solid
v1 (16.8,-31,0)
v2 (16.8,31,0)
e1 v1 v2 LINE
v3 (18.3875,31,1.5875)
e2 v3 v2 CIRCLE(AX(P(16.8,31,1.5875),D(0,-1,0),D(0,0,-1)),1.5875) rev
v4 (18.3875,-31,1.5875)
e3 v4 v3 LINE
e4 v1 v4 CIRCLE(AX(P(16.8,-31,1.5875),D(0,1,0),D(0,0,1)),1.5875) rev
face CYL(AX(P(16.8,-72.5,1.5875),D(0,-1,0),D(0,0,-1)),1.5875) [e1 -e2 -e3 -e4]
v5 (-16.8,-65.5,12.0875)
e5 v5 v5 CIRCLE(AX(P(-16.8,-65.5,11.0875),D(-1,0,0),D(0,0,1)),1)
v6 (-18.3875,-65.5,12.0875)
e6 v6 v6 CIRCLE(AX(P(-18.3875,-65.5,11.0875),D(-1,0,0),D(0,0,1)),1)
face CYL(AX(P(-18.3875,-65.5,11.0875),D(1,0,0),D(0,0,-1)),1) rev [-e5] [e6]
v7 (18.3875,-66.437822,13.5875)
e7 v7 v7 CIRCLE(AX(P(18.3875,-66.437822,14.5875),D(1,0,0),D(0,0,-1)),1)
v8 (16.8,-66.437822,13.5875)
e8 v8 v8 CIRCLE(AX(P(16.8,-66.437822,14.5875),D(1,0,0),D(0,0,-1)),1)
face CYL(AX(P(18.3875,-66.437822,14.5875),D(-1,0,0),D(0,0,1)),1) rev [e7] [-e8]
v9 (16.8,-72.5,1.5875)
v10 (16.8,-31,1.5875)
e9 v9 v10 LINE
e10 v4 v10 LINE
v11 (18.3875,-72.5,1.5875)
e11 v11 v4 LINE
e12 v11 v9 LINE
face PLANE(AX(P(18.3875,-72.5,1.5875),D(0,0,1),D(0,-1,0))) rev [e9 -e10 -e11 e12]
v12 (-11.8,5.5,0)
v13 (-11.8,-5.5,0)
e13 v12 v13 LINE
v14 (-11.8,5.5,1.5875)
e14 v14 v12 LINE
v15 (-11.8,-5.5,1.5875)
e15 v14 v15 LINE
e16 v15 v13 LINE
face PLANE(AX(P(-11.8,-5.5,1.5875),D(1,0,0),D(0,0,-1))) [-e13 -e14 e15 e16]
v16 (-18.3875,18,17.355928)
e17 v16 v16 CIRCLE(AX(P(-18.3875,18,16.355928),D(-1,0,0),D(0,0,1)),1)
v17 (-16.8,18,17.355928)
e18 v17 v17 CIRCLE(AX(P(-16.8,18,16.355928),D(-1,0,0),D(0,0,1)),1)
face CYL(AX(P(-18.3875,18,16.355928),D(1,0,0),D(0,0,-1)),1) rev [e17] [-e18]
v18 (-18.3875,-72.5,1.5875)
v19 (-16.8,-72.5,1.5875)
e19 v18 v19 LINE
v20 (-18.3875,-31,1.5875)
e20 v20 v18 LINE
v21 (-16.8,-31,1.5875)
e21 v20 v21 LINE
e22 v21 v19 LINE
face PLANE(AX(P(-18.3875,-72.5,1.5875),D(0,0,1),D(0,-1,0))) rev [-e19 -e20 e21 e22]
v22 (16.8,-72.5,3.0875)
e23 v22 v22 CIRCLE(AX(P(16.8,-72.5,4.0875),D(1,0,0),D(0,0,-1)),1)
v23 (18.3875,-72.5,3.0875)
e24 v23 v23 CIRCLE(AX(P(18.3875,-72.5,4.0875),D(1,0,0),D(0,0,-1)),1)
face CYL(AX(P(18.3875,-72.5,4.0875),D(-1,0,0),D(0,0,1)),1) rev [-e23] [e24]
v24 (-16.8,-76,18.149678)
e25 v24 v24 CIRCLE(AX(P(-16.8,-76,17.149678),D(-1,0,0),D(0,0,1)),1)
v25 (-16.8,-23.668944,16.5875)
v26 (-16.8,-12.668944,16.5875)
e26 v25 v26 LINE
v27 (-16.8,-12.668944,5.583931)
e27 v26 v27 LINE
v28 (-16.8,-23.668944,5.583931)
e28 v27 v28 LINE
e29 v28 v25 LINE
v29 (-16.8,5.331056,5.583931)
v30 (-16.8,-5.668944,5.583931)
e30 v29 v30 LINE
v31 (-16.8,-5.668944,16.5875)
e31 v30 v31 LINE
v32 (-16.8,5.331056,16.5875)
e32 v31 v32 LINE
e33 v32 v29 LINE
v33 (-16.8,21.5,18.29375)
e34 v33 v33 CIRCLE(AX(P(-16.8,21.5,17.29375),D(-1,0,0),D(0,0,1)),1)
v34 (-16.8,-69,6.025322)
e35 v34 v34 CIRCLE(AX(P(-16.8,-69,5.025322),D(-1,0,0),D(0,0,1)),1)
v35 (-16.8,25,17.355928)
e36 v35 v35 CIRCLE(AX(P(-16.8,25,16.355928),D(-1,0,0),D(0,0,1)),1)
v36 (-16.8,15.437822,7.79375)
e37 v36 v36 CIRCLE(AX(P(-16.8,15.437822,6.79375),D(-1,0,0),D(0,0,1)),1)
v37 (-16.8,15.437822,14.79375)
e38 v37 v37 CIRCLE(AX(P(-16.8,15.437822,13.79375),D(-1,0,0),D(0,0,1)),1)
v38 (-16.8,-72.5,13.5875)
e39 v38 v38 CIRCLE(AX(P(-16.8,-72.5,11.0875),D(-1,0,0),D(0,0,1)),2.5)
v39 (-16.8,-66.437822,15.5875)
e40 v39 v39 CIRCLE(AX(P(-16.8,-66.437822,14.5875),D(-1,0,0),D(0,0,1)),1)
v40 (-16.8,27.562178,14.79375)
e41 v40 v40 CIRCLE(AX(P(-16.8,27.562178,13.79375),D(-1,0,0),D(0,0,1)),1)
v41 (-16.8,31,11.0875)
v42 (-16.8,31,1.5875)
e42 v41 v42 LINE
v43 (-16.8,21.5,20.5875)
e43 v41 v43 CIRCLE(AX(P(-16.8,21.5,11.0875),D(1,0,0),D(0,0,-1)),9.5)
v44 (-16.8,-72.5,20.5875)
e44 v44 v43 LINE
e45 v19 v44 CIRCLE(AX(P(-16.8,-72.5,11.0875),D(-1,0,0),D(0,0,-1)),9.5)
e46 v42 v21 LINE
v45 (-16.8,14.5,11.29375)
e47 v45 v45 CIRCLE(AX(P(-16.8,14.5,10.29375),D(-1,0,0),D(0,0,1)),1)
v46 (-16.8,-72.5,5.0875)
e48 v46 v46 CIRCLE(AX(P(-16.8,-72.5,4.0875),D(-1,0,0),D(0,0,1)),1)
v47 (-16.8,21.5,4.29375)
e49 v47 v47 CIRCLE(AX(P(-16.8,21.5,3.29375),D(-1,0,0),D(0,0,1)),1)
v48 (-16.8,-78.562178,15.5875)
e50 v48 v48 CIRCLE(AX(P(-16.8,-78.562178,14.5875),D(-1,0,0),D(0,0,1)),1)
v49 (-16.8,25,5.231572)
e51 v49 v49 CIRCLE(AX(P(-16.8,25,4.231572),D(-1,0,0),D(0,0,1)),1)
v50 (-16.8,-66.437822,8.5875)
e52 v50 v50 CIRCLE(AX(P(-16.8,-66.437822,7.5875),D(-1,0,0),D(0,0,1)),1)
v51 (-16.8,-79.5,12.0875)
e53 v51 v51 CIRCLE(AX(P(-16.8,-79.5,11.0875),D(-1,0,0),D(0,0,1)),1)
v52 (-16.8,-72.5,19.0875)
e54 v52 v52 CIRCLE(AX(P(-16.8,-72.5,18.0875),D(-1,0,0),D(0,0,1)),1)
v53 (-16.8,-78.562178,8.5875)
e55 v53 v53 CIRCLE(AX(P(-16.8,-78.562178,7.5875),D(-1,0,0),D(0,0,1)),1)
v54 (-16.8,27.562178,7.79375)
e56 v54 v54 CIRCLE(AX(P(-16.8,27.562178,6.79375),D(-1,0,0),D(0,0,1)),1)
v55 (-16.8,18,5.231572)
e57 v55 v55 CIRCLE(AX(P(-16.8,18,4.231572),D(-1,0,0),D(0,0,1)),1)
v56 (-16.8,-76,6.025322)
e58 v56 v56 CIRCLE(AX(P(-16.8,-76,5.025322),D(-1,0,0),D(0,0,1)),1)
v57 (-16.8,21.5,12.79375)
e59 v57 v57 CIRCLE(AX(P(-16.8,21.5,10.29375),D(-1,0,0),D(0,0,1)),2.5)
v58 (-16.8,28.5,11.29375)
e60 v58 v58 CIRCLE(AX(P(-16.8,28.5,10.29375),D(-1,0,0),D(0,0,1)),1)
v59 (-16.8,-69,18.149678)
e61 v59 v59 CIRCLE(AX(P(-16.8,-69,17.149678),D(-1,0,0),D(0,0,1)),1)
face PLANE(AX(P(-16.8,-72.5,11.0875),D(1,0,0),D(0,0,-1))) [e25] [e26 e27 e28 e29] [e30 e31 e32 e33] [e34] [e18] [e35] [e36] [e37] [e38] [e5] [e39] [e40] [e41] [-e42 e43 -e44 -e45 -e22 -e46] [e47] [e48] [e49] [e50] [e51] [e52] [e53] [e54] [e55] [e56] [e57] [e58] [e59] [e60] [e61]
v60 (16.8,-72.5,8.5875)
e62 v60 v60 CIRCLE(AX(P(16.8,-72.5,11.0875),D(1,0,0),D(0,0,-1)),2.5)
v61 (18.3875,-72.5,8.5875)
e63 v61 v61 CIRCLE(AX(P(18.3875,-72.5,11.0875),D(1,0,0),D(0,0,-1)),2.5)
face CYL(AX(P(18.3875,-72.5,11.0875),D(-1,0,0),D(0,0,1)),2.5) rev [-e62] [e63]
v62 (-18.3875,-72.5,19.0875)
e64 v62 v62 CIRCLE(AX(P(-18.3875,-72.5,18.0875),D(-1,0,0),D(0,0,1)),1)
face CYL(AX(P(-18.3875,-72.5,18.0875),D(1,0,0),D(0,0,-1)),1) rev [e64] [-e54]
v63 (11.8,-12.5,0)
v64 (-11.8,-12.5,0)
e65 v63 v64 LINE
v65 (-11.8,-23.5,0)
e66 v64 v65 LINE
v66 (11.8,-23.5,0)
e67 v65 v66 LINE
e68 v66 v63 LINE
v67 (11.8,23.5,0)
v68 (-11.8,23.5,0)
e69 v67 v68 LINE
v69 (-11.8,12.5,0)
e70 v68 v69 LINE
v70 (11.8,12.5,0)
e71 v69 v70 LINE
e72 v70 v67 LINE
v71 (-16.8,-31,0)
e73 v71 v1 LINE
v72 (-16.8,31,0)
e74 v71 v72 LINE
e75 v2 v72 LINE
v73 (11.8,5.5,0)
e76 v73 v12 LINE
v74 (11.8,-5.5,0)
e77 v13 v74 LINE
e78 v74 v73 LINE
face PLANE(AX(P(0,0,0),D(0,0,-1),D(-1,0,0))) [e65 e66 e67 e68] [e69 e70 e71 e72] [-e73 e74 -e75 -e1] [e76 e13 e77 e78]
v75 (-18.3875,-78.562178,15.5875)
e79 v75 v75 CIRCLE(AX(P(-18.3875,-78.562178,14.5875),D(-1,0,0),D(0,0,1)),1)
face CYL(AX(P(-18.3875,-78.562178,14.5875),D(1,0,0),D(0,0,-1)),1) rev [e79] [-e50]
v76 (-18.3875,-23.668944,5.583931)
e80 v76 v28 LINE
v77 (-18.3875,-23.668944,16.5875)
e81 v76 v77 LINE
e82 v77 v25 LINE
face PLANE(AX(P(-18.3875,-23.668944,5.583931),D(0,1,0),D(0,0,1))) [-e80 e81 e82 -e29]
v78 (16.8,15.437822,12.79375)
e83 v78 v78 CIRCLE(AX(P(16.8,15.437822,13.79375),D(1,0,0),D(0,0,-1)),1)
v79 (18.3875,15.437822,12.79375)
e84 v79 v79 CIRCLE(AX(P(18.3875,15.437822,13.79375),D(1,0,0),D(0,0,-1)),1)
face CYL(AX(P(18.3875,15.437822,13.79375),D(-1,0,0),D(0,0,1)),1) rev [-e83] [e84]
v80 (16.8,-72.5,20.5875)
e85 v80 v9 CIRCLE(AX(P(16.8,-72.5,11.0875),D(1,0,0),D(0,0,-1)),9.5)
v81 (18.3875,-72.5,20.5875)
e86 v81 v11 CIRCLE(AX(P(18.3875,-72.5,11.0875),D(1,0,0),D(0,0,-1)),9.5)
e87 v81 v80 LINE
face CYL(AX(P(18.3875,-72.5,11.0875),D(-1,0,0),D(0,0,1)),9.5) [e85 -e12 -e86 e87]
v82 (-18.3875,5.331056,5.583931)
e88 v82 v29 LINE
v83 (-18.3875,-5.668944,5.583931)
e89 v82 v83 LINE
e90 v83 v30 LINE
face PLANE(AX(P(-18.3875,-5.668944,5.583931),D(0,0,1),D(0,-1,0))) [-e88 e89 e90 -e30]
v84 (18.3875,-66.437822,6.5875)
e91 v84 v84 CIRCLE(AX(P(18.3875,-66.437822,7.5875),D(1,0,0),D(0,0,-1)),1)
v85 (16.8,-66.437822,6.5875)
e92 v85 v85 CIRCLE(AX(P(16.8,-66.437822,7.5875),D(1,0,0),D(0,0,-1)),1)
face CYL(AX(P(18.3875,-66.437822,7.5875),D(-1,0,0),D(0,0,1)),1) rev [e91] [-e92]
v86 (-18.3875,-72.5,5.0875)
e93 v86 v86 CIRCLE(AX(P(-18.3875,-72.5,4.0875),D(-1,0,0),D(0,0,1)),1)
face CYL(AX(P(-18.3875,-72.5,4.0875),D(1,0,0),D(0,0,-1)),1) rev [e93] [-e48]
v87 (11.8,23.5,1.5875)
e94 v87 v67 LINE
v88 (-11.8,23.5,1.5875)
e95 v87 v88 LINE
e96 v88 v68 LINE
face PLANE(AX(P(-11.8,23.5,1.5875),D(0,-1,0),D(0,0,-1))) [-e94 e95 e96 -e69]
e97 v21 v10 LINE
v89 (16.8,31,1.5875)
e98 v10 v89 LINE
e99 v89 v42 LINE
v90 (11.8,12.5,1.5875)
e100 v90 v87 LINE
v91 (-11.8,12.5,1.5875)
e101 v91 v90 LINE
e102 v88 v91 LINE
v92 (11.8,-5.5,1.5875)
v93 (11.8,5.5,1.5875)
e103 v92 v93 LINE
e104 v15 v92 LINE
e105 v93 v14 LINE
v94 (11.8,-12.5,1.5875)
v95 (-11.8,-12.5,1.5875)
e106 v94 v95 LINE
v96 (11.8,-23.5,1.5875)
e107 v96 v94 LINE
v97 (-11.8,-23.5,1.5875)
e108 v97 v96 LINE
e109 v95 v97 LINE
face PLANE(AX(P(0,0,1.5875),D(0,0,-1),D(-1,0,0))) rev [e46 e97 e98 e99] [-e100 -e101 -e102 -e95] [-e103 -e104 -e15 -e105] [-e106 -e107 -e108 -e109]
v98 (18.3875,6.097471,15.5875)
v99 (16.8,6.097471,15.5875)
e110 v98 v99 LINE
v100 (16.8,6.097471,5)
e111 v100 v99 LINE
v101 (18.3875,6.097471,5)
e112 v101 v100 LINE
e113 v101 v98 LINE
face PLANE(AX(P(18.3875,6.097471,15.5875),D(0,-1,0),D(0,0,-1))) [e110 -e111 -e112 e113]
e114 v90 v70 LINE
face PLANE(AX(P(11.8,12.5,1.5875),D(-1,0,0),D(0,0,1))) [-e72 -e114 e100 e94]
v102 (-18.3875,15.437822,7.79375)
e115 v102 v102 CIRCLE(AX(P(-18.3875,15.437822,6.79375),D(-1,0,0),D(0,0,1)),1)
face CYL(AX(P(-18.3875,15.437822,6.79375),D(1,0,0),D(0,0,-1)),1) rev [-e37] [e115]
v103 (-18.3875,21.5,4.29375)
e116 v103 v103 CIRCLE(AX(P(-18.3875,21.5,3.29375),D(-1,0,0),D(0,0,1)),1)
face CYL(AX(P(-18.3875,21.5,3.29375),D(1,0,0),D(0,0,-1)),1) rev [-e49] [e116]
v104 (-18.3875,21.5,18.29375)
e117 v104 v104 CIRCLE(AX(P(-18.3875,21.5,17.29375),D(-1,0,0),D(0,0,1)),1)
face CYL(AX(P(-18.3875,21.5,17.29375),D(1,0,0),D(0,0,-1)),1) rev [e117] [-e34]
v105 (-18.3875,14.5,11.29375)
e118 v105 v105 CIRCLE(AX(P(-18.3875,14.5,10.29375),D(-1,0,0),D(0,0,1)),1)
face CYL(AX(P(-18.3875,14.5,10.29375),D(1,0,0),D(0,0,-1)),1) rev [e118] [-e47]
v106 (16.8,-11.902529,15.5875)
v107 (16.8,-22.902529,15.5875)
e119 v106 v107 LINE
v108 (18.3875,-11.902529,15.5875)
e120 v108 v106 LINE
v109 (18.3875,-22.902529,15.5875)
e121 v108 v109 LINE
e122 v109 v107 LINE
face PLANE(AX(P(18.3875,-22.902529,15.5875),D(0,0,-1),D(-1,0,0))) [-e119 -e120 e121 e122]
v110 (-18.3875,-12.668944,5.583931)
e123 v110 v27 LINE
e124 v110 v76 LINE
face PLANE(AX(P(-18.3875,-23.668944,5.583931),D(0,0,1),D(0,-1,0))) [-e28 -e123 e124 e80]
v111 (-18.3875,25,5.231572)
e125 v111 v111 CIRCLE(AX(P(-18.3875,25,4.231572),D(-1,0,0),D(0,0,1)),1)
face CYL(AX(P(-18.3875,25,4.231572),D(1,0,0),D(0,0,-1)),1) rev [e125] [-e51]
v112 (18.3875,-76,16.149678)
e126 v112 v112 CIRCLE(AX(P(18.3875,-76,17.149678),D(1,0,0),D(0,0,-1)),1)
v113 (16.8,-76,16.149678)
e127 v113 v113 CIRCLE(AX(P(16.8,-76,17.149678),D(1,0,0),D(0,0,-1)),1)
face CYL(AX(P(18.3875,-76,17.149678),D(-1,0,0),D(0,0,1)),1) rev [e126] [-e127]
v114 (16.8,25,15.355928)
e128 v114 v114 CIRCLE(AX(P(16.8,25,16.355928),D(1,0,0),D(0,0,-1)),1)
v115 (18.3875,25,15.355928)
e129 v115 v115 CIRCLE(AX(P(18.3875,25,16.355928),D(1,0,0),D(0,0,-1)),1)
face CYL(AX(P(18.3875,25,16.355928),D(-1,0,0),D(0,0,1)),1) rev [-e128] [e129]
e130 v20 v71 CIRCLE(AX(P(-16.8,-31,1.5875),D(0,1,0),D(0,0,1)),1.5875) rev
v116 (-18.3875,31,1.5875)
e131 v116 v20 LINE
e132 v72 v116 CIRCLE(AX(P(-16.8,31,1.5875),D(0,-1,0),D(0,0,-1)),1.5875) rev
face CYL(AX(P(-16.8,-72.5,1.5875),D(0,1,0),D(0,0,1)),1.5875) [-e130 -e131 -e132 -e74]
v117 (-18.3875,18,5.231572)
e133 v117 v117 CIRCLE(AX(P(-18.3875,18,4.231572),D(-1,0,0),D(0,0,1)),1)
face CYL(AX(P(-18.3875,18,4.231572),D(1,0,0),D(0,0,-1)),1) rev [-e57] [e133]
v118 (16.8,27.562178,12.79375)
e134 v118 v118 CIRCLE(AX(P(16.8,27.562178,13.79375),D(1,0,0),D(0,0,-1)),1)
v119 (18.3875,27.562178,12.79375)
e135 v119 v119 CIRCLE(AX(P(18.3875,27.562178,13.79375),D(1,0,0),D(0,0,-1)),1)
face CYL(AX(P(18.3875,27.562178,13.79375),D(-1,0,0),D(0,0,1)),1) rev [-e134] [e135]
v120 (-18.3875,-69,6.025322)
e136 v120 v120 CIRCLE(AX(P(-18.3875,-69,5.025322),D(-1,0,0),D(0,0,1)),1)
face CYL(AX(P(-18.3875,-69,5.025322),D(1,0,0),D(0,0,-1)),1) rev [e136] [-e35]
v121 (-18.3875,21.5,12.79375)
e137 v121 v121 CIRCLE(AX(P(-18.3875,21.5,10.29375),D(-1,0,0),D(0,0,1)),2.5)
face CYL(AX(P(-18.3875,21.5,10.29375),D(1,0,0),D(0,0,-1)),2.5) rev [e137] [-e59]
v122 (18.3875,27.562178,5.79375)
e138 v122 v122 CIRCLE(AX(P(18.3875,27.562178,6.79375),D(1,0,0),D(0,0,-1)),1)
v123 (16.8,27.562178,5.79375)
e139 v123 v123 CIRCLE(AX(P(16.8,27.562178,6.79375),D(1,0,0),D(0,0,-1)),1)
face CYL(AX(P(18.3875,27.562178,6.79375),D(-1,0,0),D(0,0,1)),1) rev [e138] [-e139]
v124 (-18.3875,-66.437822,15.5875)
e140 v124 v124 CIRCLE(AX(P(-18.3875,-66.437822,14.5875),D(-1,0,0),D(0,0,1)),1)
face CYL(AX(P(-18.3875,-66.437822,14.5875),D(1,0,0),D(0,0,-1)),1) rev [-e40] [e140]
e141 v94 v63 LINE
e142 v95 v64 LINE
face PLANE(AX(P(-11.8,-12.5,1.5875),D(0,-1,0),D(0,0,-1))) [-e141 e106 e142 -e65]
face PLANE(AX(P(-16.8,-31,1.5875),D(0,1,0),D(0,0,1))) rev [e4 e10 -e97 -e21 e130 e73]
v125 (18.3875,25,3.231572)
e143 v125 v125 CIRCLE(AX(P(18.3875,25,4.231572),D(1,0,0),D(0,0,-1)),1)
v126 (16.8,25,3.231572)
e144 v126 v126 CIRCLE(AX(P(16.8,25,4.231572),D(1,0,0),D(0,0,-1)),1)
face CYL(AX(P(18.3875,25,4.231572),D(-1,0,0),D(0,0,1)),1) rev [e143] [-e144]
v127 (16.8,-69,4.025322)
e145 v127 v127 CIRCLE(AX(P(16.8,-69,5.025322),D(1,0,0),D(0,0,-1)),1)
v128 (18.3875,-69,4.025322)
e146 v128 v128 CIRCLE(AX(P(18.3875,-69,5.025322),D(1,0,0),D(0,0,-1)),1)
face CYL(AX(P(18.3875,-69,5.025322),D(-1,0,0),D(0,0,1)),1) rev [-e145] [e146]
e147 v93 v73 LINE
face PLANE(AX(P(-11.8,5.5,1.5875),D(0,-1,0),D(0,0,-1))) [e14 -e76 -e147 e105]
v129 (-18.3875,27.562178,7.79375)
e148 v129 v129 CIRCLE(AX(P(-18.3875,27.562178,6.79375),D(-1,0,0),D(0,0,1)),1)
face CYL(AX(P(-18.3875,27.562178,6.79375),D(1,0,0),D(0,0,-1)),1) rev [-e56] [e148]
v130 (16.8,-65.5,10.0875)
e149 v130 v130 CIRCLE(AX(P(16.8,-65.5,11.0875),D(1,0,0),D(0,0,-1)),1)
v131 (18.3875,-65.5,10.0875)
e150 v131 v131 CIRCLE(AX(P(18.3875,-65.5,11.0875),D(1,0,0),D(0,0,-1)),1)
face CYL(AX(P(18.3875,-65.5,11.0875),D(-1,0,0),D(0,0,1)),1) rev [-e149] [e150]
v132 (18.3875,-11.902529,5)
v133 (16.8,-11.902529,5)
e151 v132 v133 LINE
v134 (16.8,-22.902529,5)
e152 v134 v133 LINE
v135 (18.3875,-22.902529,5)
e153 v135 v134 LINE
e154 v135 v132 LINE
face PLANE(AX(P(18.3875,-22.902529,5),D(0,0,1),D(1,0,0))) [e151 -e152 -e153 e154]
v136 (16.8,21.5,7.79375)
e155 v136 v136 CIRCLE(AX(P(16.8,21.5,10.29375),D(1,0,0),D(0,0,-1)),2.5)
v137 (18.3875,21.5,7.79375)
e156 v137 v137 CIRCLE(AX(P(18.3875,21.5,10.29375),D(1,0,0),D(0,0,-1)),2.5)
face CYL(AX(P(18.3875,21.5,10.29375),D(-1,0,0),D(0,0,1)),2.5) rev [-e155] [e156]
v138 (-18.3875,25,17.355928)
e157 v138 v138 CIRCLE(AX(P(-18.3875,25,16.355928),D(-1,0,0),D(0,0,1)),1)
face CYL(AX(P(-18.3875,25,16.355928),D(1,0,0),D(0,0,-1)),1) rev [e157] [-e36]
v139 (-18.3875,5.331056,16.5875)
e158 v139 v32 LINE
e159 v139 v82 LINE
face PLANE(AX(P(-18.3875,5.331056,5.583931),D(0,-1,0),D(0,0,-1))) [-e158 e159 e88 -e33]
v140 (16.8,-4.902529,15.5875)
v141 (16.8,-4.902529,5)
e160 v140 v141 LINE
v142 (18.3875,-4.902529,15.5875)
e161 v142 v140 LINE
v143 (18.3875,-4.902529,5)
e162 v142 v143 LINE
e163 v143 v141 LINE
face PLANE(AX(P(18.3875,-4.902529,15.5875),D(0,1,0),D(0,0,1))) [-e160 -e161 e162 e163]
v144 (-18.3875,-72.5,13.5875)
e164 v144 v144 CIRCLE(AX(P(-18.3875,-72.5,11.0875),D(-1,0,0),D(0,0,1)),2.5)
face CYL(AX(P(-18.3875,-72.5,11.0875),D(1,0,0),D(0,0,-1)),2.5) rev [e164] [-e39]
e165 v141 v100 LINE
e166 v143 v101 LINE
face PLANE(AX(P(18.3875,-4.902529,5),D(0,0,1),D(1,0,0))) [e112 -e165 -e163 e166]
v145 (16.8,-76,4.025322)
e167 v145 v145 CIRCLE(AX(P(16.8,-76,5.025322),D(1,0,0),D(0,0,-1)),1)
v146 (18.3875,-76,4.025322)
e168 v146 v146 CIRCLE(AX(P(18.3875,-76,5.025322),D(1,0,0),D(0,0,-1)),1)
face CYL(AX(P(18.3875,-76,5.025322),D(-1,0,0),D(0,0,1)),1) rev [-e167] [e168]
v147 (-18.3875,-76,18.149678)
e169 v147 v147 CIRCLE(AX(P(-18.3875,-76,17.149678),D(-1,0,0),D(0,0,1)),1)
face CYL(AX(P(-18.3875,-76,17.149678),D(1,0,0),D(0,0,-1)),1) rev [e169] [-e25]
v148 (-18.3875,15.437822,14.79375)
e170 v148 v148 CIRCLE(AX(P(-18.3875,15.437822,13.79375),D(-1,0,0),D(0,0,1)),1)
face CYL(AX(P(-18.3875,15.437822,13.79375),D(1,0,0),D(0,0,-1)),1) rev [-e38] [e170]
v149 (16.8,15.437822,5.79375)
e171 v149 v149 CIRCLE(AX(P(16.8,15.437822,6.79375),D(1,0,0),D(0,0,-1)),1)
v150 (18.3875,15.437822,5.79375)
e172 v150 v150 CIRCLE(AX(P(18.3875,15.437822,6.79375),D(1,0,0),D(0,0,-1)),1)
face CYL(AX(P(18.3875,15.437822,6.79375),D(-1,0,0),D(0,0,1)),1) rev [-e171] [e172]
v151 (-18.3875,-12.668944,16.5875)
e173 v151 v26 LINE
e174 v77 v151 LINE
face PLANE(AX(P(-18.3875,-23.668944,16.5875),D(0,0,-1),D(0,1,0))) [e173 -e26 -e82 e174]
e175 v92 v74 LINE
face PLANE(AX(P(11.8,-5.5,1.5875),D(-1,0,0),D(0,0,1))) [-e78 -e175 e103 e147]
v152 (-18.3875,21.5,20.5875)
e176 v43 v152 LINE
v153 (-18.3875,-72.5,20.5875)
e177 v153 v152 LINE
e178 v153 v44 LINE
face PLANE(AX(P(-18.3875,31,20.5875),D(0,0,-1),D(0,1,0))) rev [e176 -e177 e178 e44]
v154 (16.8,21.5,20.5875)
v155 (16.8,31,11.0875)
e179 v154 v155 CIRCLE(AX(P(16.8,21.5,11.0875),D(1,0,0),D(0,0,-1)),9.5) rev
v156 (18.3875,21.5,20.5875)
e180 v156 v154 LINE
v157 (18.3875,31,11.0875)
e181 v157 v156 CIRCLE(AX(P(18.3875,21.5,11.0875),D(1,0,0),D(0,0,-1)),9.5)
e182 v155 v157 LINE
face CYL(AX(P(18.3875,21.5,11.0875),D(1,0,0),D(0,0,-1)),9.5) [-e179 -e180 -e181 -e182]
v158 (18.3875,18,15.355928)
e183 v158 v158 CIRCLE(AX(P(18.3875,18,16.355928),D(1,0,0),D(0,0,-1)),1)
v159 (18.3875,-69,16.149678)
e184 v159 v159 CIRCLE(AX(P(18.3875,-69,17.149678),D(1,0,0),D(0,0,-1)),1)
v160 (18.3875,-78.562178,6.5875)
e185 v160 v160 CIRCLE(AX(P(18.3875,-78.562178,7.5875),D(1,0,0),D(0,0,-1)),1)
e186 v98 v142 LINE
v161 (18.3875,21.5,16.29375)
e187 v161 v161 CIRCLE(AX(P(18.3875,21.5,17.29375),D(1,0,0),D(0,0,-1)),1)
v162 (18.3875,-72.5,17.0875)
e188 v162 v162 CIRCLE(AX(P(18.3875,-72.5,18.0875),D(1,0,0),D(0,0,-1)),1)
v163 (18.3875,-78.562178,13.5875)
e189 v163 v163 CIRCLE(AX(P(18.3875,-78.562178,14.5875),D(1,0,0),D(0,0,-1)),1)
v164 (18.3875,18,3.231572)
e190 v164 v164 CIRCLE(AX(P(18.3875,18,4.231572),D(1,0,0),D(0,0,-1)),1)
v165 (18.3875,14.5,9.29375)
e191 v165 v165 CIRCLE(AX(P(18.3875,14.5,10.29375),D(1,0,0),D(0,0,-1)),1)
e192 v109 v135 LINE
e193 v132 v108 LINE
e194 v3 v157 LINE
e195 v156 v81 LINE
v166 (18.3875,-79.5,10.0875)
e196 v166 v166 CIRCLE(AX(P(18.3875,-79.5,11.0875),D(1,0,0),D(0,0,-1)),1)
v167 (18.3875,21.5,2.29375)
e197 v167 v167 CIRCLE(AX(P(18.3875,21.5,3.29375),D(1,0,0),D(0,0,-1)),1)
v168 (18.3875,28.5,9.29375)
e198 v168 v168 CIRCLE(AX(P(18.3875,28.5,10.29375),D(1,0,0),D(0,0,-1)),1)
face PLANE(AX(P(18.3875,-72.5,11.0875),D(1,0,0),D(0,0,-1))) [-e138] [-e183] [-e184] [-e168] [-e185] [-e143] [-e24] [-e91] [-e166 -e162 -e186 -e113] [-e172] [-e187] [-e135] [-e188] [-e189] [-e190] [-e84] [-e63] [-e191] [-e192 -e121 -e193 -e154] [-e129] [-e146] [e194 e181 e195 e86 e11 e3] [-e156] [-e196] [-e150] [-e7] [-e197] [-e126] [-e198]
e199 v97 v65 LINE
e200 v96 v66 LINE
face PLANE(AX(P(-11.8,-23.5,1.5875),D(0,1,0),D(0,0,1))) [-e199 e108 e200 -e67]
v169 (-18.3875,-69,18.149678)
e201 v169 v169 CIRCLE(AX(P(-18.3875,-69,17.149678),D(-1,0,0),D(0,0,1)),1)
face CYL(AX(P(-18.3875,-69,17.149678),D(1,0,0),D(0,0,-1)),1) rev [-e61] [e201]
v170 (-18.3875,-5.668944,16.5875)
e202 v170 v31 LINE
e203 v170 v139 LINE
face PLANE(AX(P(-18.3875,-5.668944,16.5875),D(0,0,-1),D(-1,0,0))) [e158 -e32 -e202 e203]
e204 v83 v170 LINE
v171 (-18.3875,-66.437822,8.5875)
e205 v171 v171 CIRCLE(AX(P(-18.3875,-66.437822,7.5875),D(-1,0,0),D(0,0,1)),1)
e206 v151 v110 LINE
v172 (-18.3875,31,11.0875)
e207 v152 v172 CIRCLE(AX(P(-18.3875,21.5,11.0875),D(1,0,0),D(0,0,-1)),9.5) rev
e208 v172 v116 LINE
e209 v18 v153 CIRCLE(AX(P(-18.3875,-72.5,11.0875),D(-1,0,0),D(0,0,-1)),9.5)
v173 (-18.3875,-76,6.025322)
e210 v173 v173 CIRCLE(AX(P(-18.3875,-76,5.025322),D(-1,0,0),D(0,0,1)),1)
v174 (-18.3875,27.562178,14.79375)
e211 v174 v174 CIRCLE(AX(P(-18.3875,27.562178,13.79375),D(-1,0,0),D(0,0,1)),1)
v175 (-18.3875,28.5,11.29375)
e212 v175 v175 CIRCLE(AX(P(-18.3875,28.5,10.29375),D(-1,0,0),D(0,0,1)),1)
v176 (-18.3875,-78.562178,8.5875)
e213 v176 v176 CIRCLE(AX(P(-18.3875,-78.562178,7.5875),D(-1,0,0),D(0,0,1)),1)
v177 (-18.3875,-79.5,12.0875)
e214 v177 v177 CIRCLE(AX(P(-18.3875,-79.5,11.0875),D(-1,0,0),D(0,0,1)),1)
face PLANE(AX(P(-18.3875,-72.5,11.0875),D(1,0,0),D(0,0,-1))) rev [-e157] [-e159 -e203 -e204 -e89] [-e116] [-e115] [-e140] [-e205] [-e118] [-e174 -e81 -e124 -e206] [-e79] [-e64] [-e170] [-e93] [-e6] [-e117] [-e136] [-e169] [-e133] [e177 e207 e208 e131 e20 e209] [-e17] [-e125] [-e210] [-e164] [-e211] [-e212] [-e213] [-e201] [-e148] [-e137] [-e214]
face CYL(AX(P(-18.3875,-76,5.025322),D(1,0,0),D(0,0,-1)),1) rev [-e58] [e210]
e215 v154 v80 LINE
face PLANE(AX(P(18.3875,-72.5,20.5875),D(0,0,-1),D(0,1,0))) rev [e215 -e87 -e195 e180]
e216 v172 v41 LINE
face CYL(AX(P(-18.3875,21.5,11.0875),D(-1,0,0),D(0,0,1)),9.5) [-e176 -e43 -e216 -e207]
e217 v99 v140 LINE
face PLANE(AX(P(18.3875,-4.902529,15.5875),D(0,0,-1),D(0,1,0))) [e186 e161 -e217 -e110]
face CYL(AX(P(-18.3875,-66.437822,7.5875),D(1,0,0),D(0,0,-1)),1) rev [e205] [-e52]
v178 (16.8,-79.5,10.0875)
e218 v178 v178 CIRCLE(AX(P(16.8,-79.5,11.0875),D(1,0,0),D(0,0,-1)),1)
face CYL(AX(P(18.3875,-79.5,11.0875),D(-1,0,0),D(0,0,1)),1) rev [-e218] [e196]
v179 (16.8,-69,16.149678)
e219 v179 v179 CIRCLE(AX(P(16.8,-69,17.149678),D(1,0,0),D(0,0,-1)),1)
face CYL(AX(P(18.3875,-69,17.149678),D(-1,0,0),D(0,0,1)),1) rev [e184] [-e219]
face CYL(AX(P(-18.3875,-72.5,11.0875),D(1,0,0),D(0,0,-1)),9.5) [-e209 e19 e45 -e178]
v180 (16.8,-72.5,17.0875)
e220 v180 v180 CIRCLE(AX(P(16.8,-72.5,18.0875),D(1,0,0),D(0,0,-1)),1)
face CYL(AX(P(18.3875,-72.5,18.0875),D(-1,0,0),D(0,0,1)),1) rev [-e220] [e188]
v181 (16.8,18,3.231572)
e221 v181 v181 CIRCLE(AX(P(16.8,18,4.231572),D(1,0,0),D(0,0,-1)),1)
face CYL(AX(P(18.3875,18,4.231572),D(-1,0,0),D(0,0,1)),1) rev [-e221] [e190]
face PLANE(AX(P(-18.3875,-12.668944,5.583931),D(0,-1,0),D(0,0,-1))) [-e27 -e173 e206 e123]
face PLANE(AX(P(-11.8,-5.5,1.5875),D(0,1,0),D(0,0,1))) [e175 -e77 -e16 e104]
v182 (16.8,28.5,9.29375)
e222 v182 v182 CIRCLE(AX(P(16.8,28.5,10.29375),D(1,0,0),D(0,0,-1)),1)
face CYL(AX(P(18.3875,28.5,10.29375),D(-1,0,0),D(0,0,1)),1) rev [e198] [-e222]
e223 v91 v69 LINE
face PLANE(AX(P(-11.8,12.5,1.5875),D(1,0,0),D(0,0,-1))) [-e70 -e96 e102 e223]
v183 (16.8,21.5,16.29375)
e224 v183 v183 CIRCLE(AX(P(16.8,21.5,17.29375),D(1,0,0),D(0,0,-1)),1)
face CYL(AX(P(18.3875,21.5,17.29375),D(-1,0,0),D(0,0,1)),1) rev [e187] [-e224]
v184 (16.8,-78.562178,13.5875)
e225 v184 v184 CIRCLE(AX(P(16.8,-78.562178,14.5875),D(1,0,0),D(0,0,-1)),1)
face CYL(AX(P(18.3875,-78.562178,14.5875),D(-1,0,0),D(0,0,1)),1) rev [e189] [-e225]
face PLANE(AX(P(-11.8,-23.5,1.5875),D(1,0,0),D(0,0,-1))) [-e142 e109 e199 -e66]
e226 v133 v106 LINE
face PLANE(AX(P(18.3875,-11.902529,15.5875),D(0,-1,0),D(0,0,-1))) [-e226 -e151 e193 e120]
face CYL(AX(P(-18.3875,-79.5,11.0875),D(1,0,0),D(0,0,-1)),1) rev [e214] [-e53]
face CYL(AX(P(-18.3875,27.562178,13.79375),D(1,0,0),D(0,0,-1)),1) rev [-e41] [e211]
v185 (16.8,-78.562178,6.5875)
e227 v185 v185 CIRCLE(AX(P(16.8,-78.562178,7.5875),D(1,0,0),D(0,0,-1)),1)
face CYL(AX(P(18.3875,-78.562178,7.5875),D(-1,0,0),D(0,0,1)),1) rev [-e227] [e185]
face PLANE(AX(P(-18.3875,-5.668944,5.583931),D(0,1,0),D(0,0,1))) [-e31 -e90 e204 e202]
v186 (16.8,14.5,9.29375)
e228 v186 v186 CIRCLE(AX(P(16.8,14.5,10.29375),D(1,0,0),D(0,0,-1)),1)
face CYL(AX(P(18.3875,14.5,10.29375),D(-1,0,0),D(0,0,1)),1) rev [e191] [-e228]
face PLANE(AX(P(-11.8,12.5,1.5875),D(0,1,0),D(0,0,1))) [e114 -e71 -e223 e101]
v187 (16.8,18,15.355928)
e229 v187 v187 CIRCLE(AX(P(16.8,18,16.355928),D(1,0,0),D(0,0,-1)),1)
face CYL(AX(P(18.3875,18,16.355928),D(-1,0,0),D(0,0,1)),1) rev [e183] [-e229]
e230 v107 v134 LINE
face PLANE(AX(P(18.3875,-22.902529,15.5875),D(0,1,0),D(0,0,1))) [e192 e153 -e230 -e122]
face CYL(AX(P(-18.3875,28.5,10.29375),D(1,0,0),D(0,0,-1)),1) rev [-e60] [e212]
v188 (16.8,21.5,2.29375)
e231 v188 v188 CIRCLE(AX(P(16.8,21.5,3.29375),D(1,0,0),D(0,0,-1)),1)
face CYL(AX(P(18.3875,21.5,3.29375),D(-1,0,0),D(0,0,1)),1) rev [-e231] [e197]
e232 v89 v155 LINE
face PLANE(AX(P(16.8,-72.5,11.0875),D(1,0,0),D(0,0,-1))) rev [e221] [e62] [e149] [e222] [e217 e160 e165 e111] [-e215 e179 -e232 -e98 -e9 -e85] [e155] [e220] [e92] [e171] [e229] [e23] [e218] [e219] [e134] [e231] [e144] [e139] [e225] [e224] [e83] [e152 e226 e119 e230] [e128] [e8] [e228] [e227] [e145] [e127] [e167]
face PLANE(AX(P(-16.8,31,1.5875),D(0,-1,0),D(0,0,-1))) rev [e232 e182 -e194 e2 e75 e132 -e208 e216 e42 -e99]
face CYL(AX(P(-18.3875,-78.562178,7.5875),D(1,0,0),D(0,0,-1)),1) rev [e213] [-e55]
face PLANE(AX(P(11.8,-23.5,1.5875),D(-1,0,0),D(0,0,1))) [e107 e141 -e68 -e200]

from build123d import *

# Parameters (mm, degrees)
ESQUISSE2_W        = 33.6
ESQUISSE2_H        = 62
ESQUISSE2_W_2      = 23.6
ESQUISSE2_H_2      = 11
BOSS_EXTRU_1_DEPTH = 1.5875
ESQUISSE3_R        = 2.5
ESQUISSE3_R_2      = 1
ESQUISSE3_W        = 10.5875
ESQUISSE3_H        = 11
BOSS_EXTRU_2_DEPTH = 1.5875
CONG_3_R           = 1.5875
CONG_4_R           = 9.5
ESQUISSE4_R        = 2.5
ESQUISSE4_R_2      = 1
ESQUISSE4_W        = 11.003569346
ESQUISSE4_H        = 11
BOSS_EXTRU_3_DEPTH = 1.5875
CONG_6_R           = 1.5875
CONG_7_R           = 9.5


with BuildPart() as part:
    # Esquisse2 → Boss.-Extru.1 (new body)
    with BuildSketch(Plane.XY):
        Rectangle(ESQUISSE2_W, ESQUISSE2_H)
        Rectangle(ESQUISSE2_W_2, ESQUISSE2_H_2, mode=Mode.SUBTRACT)
        with Locations((0, 18)):
            Rectangle(ESQUISSE2_W_2, ESQUISSE2_H_2, mode=Mode.SUBTRACT)
        with Locations((0, -18)):
            Rectangle(ESQUISSE2_W_2, ESQUISSE2_H_2, mode=Mode.SUBTRACT)
    extrude(amount=BOSS_EXTRU_1_DEPTH)


with BuildPart() as body_2:
    # Esquisse3 → Boss.-Extru.2 (new body)
    with BuildSketch(Plane(origin=(16.8, 0, 0), x_dir=(0, 0, -1), z_dir=(1, 0, 0))):
        with BuildLine():
            Line((-20.5875, 31), (0, 31))
            Line((0, 31), (0, -31))
            Line((0, -31), (-1.5875, -31))
            Line((-1.5875, -31), (-1.5875, -72.5))
            ThreePointArc((-1.5875, -72.5), (-11.0875, -82), (-20.5875, -72.5))
            Line((-20.5875, -72.5), (-20.5875, -31))
            Line((-20.5875, -31), (-20.5875, 31))
        make_face()
        with Locations((-11.0875, -72.5)):
            Circle(ESQUISSE3_R, mode=Mode.SUBTRACT)
        with Locations((-11.0875, -79.5)):
            Circle(ESQUISSE3_R_2, mode=Mode.SUBTRACT)
        with Locations((-14.5875, -78.562177826)):
            Circle(ESQUISSE3_R_2, mode=Mode.SUBTRACT)
        with Locations((-17.149677826, -76)):
            Circle(ESQUISSE3_R_2, mode=Mode.SUBTRACT)
        with Locations((-18.0875, -72.5)):
            Circle(ESQUISSE3_R_2, mode=Mode.SUBTRACT)
        with Locations((-17.149677826, -69)):
            Circle(ESQUISSE3_R_2, mode=Mode.SUBTRACT)
        with Locations((-14.5875, -66.437822174)):
            Circle(ESQUISSE3_R_2, mode=Mode.SUBTRACT)
        with Locations((-11.0875, -65.5)):
            Circle(ESQUISSE3_R_2, mode=Mode.SUBTRACT)
        with Locations((-7.5875, -66.437822174)):
            Circle(ESQUISSE3_R_2, mode=Mode.SUBTRACT)
        with Locations((-5.025322174, -69)):
            Circle(ESQUISSE3_R_2, mode=Mode.SUBTRACT)
        with Locations((-4.0875, -72.5)):
            Circle(ESQUISSE3_R_2, mode=Mode.SUBTRACT)
        with Locations((-5.025322174, -76)):
            Circle(ESQUISSE3_R_2, mode=Mode.SUBTRACT)
        with Locations((-7.5875, -78.562177826)):
            Circle(ESQUISSE3_R_2, mode=Mode.SUBTRACT)
        with Locations((-10.29375, 21.5)):
            Circle(ESQUISSE3_R, mode=Mode.SUBTRACT)
        with Locations((-10.29375, 28.5)):
            Circle(ESQUISSE3_R_2, mode=Mode.SUBTRACT)
        with Locations((-6.79375, 27.562177826)):
            Circle(ESQUISSE3_R_2, mode=Mode.SUBTRACT)
        with Locations((-4.231572174, 25)):
            Circle(ESQUISSE3_R_2, mode=Mode.SUBTRACT)
        with Locations((-3.29375, 21.5)):
            Circle(ESQUISSE3_R_2, mode=Mode.SUBTRACT)
        with Locations((-4.231572174, 18)):
            Circle(ESQUISSE3_R_2, mode=Mode.SUBTRACT)
        with Locations((-6.79375, 15.437822174)):
            Circle(ESQUISSE3_R_2, mode=Mode.SUBTRACT)
        with Locations((-10.29375, 14.5)):
            Circle(ESQUISSE3_R_2, mode=Mode.SUBTRACT)
        with Locations((-13.79375, 15.437822174)):
            Circle(ESQUISSE3_R_2, mode=Mode.SUBTRACT)
        with Locations((-16.355927826, 18)):
            Circle(ESQUISSE3_R_2, mode=Mode.SUBTRACT)
        with Locations((-17.29375, 21.5)):
            Circle(ESQUISSE3_R_2, mode=Mode.SUBTRACT)
        with Locations((-16.355927826, 25)):
            Circle(ESQUISSE3_R_2, mode=Mode.SUBTRACT)
        with Locations((-13.79375, 27.562177826)):
            Circle(ESQUISSE3_R_2, mode=Mode.SUBTRACT)
        with Locations((-10.29375, 0.597470968)):
            Rectangle(ESQUISSE3_W, ESQUISSE3_H, mode=Mode.SUBTRACT)
        with Locations((-10.29375, -17.402529032)):
            Rectangle(ESQUISSE3_W, ESQUISSE3_H, mode=Mode.SUBTRACT)
    extrude(amount=BOSS_EXTRU_2_DEPTH)

    # Congé3
    cong_3_edges = [body_2.edges().sort_by_distance(p)[0] for p in [
        (18.3875, 0, 0),
    ]]
    fillet(cong_3_edges, radius=CONG_3_R - 0.0001)  # a hair under: the kernel refuses the full size

    # Congé4
    cong_4_edges = [body_2.edges().sort_by_distance(p)[0] for p in [
        (17.59375, 31, 20.5875),
    ]]
    fillet(cong_4_edges, radius=CONG_4_R)

    # Intersect1: read off the stored shape, not the designer's step
    # Intersect1: union part
    add(part.part)

    # Esquisse4 → Boss.-Extru.3 (add)
    with BuildSketch(Plane.ZY.offset(16.8)):
        with BuildLine():
            Line((1.5875, 31), (0, 31))
            Line((0, 31), (0, -31))
            Line((0, -31), (1.5875, -31))
            Line((1.5875, -31), (1.5875, -72.5))
            ThreePointArc((1.5875, -72.5), (11.0875, -82), (20.5875, -72.5))
            Line((20.5875, -72.5), (20.5875, 31))
            Line((20.5875, 31), (1.5875, 31))
        make_face()
        with Locations(Location((11.0875, -72.5, 0), (0, 0, 180))):
            Circle(ESQUISSE4_R, mode=Mode.SUBTRACT)
        with Locations(Location((11.0875, -79.5, 0), (0, 0, 180))):
            Circle(ESQUISSE4_R_2, mode=Mode.SUBTRACT)
        with Locations(Location((7.5875, -78.562177826, 0), (0, 0, 180))):
            Circle(ESQUISSE4_R_2, mode=Mode.SUBTRACT)
        with Locations(Location((5.025322174, -76, 0), (0, 0, 180))):
            Circle(ESQUISSE4_R_2, mode=Mode.SUBTRACT)
        with Locations(Location((4.0875, -72.5, 0), (0, 0, 180))):
            Circle(ESQUISSE4_R_2, mode=Mode.SUBTRACT)
        with Locations(Location((5.025322174, -69, 0), (0, 0, 180))):
            Circle(ESQUISSE4_R_2, mode=Mode.SUBTRACT)
        with Locations(Location((7.5875, -66.437822174, 0), (0, 0, 180))):
            Circle(ESQUISSE4_R_2, mode=Mode.SUBTRACT)
        with Locations(Location((11.0875, -65.5, 0), (0, 0, 180))):
            Circle(ESQUISSE4_R_2, mode=Mode.SUBTRACT)
        with Locations(Location((14.5875, -66.437822174, 0), (0, 0, 180))):
            Circle(ESQUISSE4_R_2, mode=Mode.SUBTRACT)
        with Locations(Location((17.149677826, -69, 0), (0, 0, 180))):
            Circle(ESQUISSE4_R_2, mode=Mode.SUBTRACT)
        with Locations(Location((18.0875, -72.5, 0), (0, 0, 180))):
            Circle(ESQUISSE4_R_2, mode=Mode.SUBTRACT)
        with Locations(Location((17.149677826, -76, 0), (0, 0, 180))):
            Circle(ESQUISSE4_R_2, mode=Mode.SUBTRACT)
        with Locations(Location((14.5875, -78.562177826, 0), (0, 0, 180))):
            Circle(ESQUISSE4_R_2, mode=Mode.SUBTRACT)
        with Locations(Location((10.29375, 21.5, 0), (0, 0, 180))):
            Circle(ESQUISSE4_R, mode=Mode.SUBTRACT)
        with Locations(Location((6.79375, 15.437822174, 0), (0, 0, 180))):
            Circle(ESQUISSE4_R_2, mode=Mode.SUBTRACT)
        with Locations(Location((4.231572174, 18, 0), (0, 0, 180))):
            Circle(ESQUISSE4_R_2, mode=Mode.SUBTRACT)
        with Locations(Location((10.29375, 14.5, 0), (0, 0, 180))):
            Circle(ESQUISSE4_R_2, mode=Mode.SUBTRACT)
        with Locations(Location((3.29375, 21.5, 0), (0, 0, 180))):
            Circle(ESQUISSE4_R_2, mode=Mode.SUBTRACT)
        with Locations(Location((4.231572174, 25, 0), (0, 0, 180))):
            Circle(ESQUISSE4_R_2, mode=Mode.SUBTRACT)
        with Locations(Location((6.79375, 27.562177826, 0), (0, 0, 180))):
            Circle(ESQUISSE4_R_2, mode=Mode.SUBTRACT)
        with Locations(Location((10.29375, 28.5, 0), (0, 0, 180))):
            Circle(ESQUISSE4_R_2, mode=Mode.SUBTRACT)
        with Locations(Location((13.79375, 27.562177826, 0), (0, 0, 180))):
            Circle(ESQUISSE4_R_2, mode=Mode.SUBTRACT)
        with Locations(Location((16.355927826, 25, 0), (0, 0, 180))):
            Circle(ESQUISSE4_R_2, mode=Mode.SUBTRACT)
        with Locations(Location((17.29375, 21.5, 0), (0, 0, 180))):
            Circle(ESQUISSE4_R_2, mode=Mode.SUBTRACT)
        with Locations(Location((16.355927826, 18, 0), (0, 0, 180))):
            Circle(ESQUISSE4_R_2, mode=Mode.SUBTRACT)
        with Locations(Location((13.79375, 15.437822174, 0), (0, 0, 180))):
            Circle(ESQUISSE4_R_2, mode=Mode.SUBTRACT)
        with Locations((11.085715327, -0.168943848)):
            Rectangle(ESQUISSE4_W, ESQUISSE4_H, mode=Mode.SUBTRACT)
        with Locations((11.085715327, -18.168943848)):
            Rectangle(ESQUISSE4_W, ESQUISSE4_H, mode=Mode.SUBTRACT)
    extrude(amount=BOSS_EXTRU_3_DEPTH)

    # Congé6
    cong_6_edges = [body_2.edges().sort_by_distance(p)[0] for p in [
        (-18.3875, 0, 0),
    ]]
    fillet(cong_6_edges, radius=CONG_6_R)

    # Congé7
    cong_7_edges = [body_2.edges().sort_by_distance(p)[0] for p in [
        (-17.59375, 31, 20.5875),
    ]]
    fillet(cong_7_edges, radius=CONG_7_R)


solid = body_2.part
